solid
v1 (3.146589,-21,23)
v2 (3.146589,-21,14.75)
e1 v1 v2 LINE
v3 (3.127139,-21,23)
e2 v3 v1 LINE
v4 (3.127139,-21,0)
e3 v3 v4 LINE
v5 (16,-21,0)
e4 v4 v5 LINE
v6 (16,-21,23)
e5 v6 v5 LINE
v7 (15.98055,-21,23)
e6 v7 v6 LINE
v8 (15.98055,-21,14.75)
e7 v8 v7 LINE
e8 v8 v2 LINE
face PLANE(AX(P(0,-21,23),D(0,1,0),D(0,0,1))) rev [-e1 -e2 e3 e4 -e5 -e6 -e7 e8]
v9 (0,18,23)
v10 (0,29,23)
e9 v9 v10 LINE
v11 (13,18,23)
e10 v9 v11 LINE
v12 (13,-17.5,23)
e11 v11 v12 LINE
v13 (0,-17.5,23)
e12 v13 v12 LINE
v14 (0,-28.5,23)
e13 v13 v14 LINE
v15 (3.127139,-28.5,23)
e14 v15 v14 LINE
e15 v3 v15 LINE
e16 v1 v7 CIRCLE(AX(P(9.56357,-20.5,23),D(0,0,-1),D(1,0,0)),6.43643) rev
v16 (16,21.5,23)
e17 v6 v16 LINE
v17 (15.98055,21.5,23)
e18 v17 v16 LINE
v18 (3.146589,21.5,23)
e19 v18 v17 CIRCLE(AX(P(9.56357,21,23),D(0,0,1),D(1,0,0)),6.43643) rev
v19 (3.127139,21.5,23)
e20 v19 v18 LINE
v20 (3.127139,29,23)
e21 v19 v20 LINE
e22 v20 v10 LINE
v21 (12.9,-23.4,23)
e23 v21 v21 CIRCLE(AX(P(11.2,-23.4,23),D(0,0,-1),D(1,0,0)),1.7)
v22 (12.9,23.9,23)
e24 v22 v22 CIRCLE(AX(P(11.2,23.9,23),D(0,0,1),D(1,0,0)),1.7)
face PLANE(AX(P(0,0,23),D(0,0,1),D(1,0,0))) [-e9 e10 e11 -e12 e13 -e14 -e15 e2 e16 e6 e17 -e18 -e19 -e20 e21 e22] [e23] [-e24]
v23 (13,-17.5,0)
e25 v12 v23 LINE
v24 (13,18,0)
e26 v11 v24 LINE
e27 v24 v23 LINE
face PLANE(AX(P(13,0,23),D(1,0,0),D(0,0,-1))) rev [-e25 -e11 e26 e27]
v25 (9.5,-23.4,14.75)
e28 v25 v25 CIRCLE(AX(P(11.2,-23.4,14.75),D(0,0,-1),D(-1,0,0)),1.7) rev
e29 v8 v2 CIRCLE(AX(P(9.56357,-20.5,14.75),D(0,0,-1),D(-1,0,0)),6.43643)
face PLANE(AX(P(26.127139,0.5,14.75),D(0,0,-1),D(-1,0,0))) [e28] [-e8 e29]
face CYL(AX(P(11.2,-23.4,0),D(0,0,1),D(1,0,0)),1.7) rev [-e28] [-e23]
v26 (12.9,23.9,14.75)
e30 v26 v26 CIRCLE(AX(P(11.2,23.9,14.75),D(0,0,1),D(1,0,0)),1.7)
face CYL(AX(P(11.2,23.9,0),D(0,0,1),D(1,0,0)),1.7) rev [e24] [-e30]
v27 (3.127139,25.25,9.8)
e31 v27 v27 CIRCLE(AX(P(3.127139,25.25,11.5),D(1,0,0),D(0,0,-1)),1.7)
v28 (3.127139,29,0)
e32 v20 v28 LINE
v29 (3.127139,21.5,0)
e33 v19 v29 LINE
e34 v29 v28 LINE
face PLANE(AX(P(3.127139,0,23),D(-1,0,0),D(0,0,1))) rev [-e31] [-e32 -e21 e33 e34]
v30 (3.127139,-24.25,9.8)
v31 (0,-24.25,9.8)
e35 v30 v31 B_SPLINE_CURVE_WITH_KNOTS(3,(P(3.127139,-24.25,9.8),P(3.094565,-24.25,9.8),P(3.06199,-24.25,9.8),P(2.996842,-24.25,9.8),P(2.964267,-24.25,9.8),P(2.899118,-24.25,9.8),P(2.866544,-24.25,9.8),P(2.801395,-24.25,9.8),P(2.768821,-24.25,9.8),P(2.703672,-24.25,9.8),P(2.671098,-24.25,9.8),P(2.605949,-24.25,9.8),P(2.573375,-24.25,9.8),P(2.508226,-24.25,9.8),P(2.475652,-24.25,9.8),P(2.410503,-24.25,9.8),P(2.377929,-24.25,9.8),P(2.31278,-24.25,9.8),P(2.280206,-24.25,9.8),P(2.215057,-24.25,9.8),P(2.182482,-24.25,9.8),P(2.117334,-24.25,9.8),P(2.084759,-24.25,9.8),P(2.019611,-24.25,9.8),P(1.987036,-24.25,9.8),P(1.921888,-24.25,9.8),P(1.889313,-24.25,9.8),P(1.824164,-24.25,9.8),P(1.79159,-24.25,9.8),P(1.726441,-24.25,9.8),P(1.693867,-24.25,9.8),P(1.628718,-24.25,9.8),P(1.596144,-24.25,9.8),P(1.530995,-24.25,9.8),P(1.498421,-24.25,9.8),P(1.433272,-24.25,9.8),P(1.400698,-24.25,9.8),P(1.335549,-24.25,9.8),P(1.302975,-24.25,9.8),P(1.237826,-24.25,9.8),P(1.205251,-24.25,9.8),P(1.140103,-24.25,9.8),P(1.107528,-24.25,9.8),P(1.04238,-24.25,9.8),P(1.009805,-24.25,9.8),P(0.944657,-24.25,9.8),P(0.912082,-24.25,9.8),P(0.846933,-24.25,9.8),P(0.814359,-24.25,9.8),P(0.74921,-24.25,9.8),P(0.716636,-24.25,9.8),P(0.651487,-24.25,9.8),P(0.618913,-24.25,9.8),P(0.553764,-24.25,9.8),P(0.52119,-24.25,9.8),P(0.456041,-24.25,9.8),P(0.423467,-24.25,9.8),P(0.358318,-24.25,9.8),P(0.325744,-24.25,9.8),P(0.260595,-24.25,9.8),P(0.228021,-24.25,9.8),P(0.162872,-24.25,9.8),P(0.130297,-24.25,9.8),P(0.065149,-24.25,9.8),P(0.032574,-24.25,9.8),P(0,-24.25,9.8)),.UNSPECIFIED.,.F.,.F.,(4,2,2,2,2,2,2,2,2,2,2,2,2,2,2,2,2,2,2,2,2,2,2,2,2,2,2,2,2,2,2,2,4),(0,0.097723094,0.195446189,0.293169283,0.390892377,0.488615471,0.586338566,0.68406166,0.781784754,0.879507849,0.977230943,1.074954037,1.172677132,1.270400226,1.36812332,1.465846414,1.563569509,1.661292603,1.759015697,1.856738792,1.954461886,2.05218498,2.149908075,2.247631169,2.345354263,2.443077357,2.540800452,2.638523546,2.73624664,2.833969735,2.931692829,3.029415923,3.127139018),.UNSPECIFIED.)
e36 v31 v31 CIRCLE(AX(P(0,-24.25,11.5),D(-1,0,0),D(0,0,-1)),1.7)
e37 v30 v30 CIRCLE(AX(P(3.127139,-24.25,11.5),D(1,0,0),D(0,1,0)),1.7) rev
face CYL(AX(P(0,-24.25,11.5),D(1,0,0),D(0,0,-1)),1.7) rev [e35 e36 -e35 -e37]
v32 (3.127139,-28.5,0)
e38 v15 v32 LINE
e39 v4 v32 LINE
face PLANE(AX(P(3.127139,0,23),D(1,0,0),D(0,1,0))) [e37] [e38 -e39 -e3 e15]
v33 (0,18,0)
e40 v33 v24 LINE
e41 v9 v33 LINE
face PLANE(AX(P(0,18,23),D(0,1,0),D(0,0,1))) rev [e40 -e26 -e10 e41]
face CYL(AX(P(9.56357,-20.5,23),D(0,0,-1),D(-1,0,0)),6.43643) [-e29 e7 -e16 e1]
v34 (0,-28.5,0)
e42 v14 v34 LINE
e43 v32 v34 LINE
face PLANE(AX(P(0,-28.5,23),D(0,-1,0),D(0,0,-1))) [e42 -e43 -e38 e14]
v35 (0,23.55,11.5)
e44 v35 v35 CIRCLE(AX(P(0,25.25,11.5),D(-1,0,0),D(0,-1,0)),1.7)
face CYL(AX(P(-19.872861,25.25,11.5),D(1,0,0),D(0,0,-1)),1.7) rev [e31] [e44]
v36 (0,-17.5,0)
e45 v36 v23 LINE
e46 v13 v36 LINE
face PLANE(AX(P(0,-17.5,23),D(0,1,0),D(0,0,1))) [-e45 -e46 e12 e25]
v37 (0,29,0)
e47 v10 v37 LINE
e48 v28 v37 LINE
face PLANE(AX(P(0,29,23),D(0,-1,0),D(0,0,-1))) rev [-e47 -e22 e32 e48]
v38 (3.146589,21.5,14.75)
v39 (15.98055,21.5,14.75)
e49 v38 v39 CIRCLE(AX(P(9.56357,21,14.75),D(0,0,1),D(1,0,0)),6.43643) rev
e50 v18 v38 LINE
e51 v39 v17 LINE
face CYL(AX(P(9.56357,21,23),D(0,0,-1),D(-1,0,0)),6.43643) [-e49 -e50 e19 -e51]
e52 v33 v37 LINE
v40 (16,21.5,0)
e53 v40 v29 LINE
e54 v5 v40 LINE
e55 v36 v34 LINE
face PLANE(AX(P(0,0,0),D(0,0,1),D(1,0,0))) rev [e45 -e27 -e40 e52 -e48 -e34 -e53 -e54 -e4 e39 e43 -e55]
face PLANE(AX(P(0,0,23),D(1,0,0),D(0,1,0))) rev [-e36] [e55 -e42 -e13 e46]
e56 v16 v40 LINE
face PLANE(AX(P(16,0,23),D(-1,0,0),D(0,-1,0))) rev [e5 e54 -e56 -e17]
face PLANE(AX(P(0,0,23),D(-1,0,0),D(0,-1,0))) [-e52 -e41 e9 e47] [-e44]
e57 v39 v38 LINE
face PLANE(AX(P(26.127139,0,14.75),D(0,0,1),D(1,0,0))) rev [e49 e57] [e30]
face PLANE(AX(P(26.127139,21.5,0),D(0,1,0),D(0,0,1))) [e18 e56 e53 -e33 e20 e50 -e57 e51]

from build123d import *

# Parameters (mm, degrees)
BOSS_EXTRUDE1_DEPTH = 23
SKETCH2_R           = 1.7
CUT_EXTRUDE1_DEPTH  = 39.81958977
CUT_EXTRUDE5_START  = 23
SKETCH2_8_W         = 14.75
SKETCH2_8_H         = 7
SKETCH2_8_R         = 1.7
CUT_EXTRUDE5_DEPTH  = 23
SKETCH5_R           = 1.7
CUT_EXTRUDE6_DEPTH  = 41.323690307
SKETCH6_R           = 1.7
CUT_EXTRUDE7_DEPTH  = 23


with BuildPart() as part:
    # Sketch1 → Boss-Extrude1 (new body)
    with BuildSketch(Plane.XY):
        with BuildLine():
            Line((13, 18), (13, -18))
            Line((13, -18), (0, -18))
            Line((0, -18), (0, -28.5))
            Line((0, -28.5), (3.127139018, -28.5))
            Line((3.127139018, -28.5), (3.127139018, -21))
            Line((3.127139018, -21), (16, -21))
            Line((16, -21), (16, 21))
            ThreePointArc((16, 21), (9.563569509, 27.436430491), (3.127139018, 21))
            Line((3.127139018, 21), (3.127139018, 28.5))
            Line((3.127139018, 28.5), (0, 28.5))
            Line((0, 28.5), (0, 18))
            Line((0, 18), (13, 18))
        make_face()
    boss_extrude1 = extrude(amount=BOSS_EXTRUDE1_DEPTH)

    # Sketch2 → Cut-Extrude1 (cut, symmetric)
    with BuildSketch(Plane(origin=(3.127139018, 0, 0), x_dir=(0, 0, -1), z_dir=(1, 0, 0))):
        with Locations((-11.5, 24.75)):
            Circle(SKETCH2_R)
    cut_extrude1 = extrude(amount=CUT_EXTRUDE1_DEPTH, both=True, mode=Mode.SUBTRACT)

    # Sketch2<8> → Cut-Extrude5 (cut)
    with BuildSketch(Plane(origin=(3.127139018, 0, 0), x_dir=(0, 0, -1), z_dir=(1, 0, 0)).offset(CUT_EXTRUDE5_START)):
        with Locations((-7.375, 25)):
            Rectangle(SKETCH2_8_W, SKETCH2_8_H)
        with Locations((-11.5, 24.75)):
            Circle(SKETCH2_8_R, mode=Mode.SUBTRACT)
    cut_extrude5 = extrude(amount=-CUT_EXTRUDE5_DEPTH, mode=Mode.SUBTRACT)

    # Mirror5: Boss-Extrude1, Cut-Extrude1, Cut-Extrude5 across plane
    add(boss_extrude1.mirror(Plane(origin=(0, 0.25, 0), x_dir=(0, 0, 1), z_dir=(0, -1, 0))))
    add(cut_extrude1.mirror(Plane(origin=(0, 0.25, 0), x_dir=(0, 0, 1), z_dir=(0, -1, 0))), mode=Mode.SUBTRACT)
    add(cut_extrude5.mirror(Plane(origin=(0, 0.25, 0), x_dir=(0, 0, 1), z_dir=(0, -1, 0))), mode=Mode.SUBTRACT)

    # Sketch5 → Cut-Extrude6 (cut, through all)
    with BuildSketch(Plane.XY.offset(23)):
        with Locations((11.2, 23.9)):
            Circle(SKETCH5_R)
    cut_extrude6 = extrude(amount=-CUT_EXTRUDE6_DEPTH, mode=Mode.SUBTRACT)

    # Mirror8: Cut-Extrude6 across plane
    add(cut_extrude6.mirror(Plane(origin=(0, 0.25, 0), x_dir=(0, 0, 1), z_dir=(0, -1, 0))), mode=Mode.SUBTRACT)

    # Sketch6 → Cut-Extrude7 (cut)
    with BuildSketch(Plane(origin=(3.127139018, 0, 0), x_dir=(0, 0, -1), z_dir=(1, 0, 0))):
        with Locations((-11.5, 25.25)):
            Circle(SKETCH6_R)
    extrude(amount=-CUT_EXTRUDE7_DEPTH, mode=Mode.SUBTRACT)


solid = part.part
